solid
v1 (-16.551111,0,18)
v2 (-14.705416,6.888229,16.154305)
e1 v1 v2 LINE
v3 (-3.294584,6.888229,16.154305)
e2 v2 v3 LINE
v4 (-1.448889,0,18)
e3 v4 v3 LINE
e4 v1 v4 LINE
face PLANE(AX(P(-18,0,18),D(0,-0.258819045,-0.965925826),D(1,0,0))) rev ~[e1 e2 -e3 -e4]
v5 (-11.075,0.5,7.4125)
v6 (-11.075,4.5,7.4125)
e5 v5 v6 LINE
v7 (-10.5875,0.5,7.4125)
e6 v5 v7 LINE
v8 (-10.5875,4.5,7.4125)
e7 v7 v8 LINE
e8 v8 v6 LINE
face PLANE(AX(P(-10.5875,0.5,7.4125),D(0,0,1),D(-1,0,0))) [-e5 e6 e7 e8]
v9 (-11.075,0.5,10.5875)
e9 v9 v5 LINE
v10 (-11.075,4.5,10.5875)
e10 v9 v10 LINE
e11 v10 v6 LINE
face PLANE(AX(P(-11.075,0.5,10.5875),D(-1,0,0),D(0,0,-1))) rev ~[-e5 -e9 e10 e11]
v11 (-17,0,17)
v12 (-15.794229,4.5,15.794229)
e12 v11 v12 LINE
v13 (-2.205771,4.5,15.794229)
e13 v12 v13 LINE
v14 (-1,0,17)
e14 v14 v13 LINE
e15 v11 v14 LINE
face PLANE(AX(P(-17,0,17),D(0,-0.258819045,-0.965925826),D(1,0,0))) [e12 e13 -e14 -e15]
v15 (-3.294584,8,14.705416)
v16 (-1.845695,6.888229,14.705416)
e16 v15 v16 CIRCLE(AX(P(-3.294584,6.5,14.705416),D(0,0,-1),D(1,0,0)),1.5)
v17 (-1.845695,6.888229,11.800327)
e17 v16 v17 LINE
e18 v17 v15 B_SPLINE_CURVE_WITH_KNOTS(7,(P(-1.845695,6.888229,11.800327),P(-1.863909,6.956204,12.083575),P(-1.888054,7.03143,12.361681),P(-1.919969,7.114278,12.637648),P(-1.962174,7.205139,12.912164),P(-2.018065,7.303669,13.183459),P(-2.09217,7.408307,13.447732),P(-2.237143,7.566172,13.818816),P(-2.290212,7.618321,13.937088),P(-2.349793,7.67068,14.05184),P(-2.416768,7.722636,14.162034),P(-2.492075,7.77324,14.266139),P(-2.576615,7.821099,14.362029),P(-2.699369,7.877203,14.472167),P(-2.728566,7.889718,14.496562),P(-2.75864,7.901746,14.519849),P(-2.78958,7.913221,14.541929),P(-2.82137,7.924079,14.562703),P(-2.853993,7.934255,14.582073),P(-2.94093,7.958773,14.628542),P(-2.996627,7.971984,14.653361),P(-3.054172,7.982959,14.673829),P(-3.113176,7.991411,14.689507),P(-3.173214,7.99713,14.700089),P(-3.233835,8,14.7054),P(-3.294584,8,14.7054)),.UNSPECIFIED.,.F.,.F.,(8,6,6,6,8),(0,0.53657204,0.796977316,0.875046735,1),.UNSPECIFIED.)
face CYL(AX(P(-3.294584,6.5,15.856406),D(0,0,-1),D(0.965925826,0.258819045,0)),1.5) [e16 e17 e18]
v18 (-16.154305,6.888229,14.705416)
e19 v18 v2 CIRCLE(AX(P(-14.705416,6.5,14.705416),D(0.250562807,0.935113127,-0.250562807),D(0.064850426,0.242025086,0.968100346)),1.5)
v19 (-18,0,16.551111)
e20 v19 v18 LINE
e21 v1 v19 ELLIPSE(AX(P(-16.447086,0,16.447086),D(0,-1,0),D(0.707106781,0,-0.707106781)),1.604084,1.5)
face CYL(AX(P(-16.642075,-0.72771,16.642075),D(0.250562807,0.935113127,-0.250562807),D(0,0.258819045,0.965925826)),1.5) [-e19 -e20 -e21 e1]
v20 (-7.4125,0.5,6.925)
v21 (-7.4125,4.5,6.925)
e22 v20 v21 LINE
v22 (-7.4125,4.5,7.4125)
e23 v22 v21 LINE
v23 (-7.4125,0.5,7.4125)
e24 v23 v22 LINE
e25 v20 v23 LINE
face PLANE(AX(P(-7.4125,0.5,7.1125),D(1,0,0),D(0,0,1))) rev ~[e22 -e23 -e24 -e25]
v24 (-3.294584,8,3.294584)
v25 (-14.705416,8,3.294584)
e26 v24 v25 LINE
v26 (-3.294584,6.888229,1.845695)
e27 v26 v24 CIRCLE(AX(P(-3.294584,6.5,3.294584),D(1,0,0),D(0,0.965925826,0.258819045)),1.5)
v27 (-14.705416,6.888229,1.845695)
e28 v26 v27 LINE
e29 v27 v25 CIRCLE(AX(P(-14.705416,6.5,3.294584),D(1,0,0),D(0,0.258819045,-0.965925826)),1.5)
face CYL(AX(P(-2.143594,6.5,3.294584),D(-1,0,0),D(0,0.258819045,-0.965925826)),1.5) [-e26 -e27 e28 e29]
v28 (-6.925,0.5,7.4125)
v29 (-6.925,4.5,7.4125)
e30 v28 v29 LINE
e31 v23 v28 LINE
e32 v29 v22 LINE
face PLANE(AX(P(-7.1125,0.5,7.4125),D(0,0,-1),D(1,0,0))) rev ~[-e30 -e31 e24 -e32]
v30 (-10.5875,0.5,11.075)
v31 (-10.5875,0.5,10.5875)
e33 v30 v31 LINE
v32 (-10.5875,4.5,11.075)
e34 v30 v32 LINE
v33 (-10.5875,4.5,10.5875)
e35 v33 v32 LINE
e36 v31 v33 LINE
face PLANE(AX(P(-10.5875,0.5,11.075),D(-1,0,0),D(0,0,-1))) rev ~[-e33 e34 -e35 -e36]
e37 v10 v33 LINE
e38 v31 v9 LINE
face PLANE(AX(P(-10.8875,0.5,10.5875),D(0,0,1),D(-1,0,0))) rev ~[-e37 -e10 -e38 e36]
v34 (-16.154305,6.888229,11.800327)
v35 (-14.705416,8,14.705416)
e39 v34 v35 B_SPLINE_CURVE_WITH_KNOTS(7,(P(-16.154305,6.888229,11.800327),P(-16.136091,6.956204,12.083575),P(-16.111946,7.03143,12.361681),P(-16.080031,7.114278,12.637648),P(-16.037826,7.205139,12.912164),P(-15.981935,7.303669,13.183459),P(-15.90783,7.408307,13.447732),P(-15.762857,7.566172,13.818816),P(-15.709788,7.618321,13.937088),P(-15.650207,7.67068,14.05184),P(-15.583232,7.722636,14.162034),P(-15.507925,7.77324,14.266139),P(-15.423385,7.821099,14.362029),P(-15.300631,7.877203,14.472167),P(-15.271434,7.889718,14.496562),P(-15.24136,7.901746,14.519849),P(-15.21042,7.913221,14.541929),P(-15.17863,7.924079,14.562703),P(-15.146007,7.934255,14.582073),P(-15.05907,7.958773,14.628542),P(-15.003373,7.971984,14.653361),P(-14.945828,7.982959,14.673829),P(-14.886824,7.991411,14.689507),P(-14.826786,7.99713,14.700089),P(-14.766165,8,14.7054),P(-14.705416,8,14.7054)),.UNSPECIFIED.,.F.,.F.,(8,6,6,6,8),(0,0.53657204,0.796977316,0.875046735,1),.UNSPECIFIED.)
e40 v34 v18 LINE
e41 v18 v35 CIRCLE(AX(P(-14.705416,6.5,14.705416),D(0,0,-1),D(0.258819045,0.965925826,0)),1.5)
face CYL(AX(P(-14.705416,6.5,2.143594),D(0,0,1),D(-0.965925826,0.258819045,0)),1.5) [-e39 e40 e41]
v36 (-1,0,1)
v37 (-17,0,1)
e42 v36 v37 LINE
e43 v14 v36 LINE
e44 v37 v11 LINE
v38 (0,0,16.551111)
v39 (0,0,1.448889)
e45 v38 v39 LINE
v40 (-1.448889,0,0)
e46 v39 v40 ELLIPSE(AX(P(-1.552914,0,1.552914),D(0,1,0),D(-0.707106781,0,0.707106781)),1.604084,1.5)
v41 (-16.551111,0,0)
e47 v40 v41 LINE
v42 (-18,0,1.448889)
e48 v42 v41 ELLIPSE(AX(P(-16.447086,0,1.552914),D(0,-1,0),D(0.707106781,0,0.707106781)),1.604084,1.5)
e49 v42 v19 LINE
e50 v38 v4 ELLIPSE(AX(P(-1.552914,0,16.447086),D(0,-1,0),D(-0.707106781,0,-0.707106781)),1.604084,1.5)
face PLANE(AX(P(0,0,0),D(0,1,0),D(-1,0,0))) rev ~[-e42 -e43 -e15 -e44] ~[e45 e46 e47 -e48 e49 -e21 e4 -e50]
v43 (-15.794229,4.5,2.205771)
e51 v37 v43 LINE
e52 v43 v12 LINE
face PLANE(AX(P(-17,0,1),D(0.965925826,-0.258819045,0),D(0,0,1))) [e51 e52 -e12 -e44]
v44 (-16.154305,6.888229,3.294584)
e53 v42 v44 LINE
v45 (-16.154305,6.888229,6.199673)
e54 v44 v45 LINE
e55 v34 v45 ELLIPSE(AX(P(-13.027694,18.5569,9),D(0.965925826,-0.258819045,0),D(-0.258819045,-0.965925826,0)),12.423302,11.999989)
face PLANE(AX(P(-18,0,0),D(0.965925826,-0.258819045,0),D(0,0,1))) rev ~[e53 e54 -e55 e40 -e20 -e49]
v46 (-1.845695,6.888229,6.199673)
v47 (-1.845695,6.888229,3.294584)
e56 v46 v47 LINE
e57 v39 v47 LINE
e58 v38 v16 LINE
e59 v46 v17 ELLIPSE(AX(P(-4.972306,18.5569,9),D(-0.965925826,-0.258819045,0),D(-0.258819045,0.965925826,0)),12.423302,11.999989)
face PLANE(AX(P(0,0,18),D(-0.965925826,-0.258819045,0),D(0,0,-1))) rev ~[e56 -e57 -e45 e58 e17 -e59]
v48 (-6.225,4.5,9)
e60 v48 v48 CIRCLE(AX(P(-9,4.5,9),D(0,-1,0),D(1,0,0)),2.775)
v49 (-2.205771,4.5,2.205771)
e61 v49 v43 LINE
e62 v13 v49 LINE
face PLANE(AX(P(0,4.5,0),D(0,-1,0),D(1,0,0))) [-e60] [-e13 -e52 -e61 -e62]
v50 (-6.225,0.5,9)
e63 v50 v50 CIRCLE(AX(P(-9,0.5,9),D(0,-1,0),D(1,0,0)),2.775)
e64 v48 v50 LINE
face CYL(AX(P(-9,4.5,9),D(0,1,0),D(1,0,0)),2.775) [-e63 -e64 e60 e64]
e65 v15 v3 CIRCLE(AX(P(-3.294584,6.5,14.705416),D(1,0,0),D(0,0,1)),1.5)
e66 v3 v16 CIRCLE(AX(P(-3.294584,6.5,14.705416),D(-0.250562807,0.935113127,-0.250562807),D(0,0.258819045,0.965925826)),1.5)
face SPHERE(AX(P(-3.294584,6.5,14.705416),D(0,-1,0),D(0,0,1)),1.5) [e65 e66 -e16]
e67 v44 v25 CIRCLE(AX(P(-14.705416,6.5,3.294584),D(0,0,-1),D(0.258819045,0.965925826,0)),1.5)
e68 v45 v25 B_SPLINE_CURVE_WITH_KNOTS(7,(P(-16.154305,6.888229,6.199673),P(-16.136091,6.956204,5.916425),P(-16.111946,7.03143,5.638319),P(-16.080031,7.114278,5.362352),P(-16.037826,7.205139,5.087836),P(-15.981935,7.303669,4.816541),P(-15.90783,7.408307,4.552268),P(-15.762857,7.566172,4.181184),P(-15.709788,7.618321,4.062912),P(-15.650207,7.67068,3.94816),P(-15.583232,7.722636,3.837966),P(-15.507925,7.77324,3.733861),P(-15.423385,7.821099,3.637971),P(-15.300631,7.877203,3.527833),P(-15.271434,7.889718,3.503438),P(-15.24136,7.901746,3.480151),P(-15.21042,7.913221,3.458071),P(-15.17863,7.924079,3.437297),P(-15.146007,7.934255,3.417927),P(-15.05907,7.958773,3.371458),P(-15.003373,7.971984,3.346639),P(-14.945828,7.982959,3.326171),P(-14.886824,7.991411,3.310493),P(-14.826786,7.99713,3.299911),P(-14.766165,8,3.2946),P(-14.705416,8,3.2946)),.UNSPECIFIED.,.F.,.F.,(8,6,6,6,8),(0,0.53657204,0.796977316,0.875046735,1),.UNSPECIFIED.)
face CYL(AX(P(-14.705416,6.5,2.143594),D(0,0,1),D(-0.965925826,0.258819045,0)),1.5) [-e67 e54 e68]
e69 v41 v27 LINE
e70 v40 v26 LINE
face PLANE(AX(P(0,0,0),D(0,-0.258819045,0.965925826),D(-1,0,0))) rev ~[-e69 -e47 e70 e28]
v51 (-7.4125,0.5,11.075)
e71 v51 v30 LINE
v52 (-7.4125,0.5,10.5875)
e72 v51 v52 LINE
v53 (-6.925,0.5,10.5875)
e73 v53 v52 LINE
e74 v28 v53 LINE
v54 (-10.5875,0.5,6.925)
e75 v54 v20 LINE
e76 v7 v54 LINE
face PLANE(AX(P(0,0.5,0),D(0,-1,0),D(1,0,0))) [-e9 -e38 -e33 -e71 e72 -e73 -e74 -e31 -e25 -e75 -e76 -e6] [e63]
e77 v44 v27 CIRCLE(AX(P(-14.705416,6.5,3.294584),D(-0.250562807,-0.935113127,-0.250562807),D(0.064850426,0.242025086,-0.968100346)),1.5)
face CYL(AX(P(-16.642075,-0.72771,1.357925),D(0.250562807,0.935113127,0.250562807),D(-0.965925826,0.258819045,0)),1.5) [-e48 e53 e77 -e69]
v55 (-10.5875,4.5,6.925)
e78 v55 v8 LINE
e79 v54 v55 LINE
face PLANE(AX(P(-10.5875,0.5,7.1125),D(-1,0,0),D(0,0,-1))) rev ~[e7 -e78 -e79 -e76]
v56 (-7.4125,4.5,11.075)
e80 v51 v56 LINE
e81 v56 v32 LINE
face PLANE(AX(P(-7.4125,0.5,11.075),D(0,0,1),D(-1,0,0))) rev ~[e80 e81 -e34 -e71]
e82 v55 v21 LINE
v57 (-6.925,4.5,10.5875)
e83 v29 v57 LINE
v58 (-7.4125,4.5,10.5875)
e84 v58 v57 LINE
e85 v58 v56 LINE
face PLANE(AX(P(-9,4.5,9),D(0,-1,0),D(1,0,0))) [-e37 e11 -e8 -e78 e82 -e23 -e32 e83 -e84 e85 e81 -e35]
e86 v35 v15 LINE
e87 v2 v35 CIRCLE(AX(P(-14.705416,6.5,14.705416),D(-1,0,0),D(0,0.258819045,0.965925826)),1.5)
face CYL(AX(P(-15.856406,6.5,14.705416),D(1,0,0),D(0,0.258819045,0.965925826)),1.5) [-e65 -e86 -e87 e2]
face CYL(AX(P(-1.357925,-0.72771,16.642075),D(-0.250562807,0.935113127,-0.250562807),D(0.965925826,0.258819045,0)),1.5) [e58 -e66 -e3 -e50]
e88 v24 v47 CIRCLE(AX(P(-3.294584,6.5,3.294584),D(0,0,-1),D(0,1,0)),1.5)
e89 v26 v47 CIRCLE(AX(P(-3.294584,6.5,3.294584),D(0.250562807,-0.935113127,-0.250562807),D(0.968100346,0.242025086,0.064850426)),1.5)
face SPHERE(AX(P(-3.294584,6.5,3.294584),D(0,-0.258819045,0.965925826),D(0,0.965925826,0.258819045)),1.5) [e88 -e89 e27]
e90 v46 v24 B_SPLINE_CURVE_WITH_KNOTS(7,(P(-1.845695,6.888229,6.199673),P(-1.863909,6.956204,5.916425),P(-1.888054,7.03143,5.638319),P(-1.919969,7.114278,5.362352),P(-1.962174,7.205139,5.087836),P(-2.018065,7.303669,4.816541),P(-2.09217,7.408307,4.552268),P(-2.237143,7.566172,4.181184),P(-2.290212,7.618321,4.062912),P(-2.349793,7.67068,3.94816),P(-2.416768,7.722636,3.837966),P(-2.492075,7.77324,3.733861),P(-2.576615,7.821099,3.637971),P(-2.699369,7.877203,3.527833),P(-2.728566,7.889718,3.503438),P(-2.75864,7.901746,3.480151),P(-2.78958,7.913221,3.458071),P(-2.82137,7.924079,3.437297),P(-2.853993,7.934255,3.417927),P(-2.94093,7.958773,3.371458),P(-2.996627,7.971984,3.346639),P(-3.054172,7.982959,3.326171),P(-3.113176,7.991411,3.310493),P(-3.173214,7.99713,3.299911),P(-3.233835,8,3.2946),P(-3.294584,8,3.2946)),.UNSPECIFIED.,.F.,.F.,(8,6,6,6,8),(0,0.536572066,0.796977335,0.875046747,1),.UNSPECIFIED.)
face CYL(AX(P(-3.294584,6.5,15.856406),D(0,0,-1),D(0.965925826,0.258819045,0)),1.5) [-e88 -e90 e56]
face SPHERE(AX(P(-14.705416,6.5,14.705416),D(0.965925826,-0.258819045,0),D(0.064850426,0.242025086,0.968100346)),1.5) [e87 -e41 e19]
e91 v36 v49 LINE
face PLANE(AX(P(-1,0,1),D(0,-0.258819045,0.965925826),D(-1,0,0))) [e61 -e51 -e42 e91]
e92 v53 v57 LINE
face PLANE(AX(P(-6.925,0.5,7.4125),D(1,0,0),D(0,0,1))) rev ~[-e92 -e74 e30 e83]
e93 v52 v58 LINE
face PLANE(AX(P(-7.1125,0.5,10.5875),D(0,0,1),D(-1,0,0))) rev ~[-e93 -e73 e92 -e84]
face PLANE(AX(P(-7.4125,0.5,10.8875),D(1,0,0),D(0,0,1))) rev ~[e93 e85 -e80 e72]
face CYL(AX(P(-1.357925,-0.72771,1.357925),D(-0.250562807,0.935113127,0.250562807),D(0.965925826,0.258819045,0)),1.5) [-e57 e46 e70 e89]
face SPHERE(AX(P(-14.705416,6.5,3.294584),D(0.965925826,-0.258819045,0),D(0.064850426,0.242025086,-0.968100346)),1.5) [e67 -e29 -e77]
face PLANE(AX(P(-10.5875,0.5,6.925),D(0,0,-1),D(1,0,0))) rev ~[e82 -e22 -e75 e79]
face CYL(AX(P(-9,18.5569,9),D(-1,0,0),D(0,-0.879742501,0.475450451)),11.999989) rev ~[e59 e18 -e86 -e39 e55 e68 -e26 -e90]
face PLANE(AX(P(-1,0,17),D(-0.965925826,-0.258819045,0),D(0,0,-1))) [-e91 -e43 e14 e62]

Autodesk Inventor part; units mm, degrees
ref_plane "YZ Plane" through (0, 0, 0) normal (1, 0, 0) x (0, 1, 0)
ref_plane "XZ Plane" through (0, 0, 0) normal (0, 1, 0) x (-1, 0, 0)
sketch "Sketch1" plane through (0, 0, 0) normal (0, 1, 0) x (-1, 0, 0)
  line L0 (0, 0) -> (18, 0)
  line L1 (18, 0) -> (18, 18)
  line L2 (18, 18) -> (0, 18)
  line L3 (0, 18) -> (0, 0)
  dimension "d0" = 18
  dimension "d1" = 18
extrude "Extrusion1" add sketch "Sketch1" along normal blind 8 draft -15
fillet "Fillet1" radius 1.5 8 edges at (-1.0718, 4, 16.9282) (-9, 8, 15.8564) (-2.1436, 8, 9) (-9, 8, 2.1436) (-1.0718, 4, 1.0718) (-16.9282, 4, 1.0718) (-16.9282, 4, 16.9282) (-15.8564, 8, 9)
ref_plane "Work Plane1" through (-9, 33.5885, 16.5511) normal (1, 0, 0) x (0, 0, -1)
sketch "Sketch2" plane through (-9, 33.5885, 16.5511) normal (1, 0, 0) x (0, 0, -1)
  line L0 (13.2565, -25.5885) -> (1.8457, -25.5885) projected
  arc A0 (14.7054, -26.7002) -> (13.2565, -25.5885) centre (13.2565, -27.0885) ccw projected
  arc A1 (1.8457, -25.5885) -> (13.2565, -25.5885) centre (7.5511, -15.0316) ccw
  point P0 (16.5511, -33.5885)
  point P1 (13.2565, -25.5885)
  dimension "d5" = 12
extrude "Extrusion2" cut sketch "Sketch2" along normal through all both and the other way through all
sketch "Sketch3" plane through (0, 0, 0) normal (0, -1, 0) x (1, 0, 0)
  line L0 (-16.5511, 18) -> (-1.4489, 18) construction
  line L1 (-9, 18) -> (-9, 0) construction
  line L2 (-1.4489, 0) -> (-16.5511, 0) construction
  line L3 (-18, 1.4489) -> (-18, 16.5511) construction
  line L4 (-18, 9) -> (0, 9) construction
  line L5 (-1, 1) -> (-17, 1)
  line L6 (-17, 1) -> (-17, 17)
  line L7 (-17, 17) -> (-1, 17)
  line L8 (-1, 17) -> (-1, 1)
  line L9 (-1, 1) -> (-17, 17) construction
  line L10 (-17, 1) -> (-1, 17) construction
  point P0 (0, 0)
  point P1 (-9, 9)
  point P2 (-9, 9)
  dimension "d8" = 16
  dimension "d9" = 16
extrude "Extrusion3" cut sketch "Sketch3" against normal blind 4.5 draft -15
sketch "Sketch4" plane through (0, 4.5, 0) normal (0, -1, 0) x (1, 0, 0)
  line L0 (-15.7942, 15.7942) -> (-15.7942, 2.2058) construction
  line L1 (-15.7942, 9) -> (-2.2058, 9) construction
  line L2 (-2.2058, 2.2058) -> (-2.2058, 15.7942) construction
  line L3 (-2.2058, 15.7942) -> (-15.7942, 15.7942) construction
  line L4 (-9, 15.7942) -> (-9, 2.2058) construction
  line L5 (-15.7942, 2.2058) -> (-2.2058, 2.2058) construction
  circle A0 centre (-9, 9) radius 2.775
  point P0 (0, 0)
  dimension "d12" = 5.55
extrude "Extrusion4" add sketch "Sketch4" along normal blind 4
sketch "Sketch5" plane through (-9, 0.5, 9) normal (0, -1, 0) x (1, 0, 0)
  line L0 (1.5875, 2.075) -> (-1.5875, 2.075)
  line L1 (-1.5875, -2.075) -> (1.5875, -2.075)
  line L2 (-1.5875, 2.075) -> (1.5875, -2.075) construction
  line L3 (-2.075, 1.5875) -> (-2.075, -1.5875)
  line L4 (2.075, -1.5875) -> (2.075, 1.5875)
  line L5 (2.075, 1.5875) -> (-2.075, -1.5875) construction
  line L6 (-2.075, 1.5875) -> (2.075, -1.5875) construction
  line L7 (-6.7942, 6.7942) -> (-6.7942, -6.7942) construction
  line L8 (-6.7942, 0) -> (6.7942, 0) construction
  line L9 (6.7942, -6.7942) -> (6.7942, 6.7942) construction
  line L10 (-6.7942, -6.7942) -> (6.7942, -6.7942) construction
  line L11 (0, -6.7942) -> (0, 6.7942) construction
  line L12 (-1.5875, 2.075) -> (-1.5875, 1.8875)
  line L13 (-1.5875, -1.8875) -> (-1.5875, -2.075)
  line L14 (-2.075, -1.5875) -> (-1.8875, -1.5875)
  line L15 (-1.8875, 1.5875) -> (-2.075, 1.5875)
  line L16 (0, 0) -> (-1.5875, -2.075) construction
  line L17 (2.075, 1.5875) -> (1.8875, 1.5875)
  line L18 (1.8875, -1.5875) -> (2.075, -1.5875)
  line L19 (1.5875, -2.075) -> (1.5875, -1.8875)
  line L20 (1.5875, 1.8875) -> (1.5875, 2.075)
  line L21 (-1.5875, 1.8875) -> (-1.5875, -1.8875)
  line L22 (1.8875, 1.5875) -> (1.5875, 1.5875)
  line L23 (-1.5875, 1.5875) -> (-1.8875, 1.5875)
  line L24 (1.5875, -1.8875) -> (1.5875, -1.5875)
  line L25 (1.5875, 1.2145) -> (1.5875, 1.8875)
  line L26 (1.8875, -1.5875) -> (1.5875, -1.5875)
  line L27 (-1.5875, -1.5875) -> (-1.8875, -1.5875)
  point P0 (9, -9)
  dimension "d15" = 3.175
  dimension "d16" = 4.15
  dimension "d17" = 4.15
  dimension "d18" = 3.175
extrude "Extrusion5" cut sketch "Sketch5" against normal blind 4
properties part number "Keycap"
